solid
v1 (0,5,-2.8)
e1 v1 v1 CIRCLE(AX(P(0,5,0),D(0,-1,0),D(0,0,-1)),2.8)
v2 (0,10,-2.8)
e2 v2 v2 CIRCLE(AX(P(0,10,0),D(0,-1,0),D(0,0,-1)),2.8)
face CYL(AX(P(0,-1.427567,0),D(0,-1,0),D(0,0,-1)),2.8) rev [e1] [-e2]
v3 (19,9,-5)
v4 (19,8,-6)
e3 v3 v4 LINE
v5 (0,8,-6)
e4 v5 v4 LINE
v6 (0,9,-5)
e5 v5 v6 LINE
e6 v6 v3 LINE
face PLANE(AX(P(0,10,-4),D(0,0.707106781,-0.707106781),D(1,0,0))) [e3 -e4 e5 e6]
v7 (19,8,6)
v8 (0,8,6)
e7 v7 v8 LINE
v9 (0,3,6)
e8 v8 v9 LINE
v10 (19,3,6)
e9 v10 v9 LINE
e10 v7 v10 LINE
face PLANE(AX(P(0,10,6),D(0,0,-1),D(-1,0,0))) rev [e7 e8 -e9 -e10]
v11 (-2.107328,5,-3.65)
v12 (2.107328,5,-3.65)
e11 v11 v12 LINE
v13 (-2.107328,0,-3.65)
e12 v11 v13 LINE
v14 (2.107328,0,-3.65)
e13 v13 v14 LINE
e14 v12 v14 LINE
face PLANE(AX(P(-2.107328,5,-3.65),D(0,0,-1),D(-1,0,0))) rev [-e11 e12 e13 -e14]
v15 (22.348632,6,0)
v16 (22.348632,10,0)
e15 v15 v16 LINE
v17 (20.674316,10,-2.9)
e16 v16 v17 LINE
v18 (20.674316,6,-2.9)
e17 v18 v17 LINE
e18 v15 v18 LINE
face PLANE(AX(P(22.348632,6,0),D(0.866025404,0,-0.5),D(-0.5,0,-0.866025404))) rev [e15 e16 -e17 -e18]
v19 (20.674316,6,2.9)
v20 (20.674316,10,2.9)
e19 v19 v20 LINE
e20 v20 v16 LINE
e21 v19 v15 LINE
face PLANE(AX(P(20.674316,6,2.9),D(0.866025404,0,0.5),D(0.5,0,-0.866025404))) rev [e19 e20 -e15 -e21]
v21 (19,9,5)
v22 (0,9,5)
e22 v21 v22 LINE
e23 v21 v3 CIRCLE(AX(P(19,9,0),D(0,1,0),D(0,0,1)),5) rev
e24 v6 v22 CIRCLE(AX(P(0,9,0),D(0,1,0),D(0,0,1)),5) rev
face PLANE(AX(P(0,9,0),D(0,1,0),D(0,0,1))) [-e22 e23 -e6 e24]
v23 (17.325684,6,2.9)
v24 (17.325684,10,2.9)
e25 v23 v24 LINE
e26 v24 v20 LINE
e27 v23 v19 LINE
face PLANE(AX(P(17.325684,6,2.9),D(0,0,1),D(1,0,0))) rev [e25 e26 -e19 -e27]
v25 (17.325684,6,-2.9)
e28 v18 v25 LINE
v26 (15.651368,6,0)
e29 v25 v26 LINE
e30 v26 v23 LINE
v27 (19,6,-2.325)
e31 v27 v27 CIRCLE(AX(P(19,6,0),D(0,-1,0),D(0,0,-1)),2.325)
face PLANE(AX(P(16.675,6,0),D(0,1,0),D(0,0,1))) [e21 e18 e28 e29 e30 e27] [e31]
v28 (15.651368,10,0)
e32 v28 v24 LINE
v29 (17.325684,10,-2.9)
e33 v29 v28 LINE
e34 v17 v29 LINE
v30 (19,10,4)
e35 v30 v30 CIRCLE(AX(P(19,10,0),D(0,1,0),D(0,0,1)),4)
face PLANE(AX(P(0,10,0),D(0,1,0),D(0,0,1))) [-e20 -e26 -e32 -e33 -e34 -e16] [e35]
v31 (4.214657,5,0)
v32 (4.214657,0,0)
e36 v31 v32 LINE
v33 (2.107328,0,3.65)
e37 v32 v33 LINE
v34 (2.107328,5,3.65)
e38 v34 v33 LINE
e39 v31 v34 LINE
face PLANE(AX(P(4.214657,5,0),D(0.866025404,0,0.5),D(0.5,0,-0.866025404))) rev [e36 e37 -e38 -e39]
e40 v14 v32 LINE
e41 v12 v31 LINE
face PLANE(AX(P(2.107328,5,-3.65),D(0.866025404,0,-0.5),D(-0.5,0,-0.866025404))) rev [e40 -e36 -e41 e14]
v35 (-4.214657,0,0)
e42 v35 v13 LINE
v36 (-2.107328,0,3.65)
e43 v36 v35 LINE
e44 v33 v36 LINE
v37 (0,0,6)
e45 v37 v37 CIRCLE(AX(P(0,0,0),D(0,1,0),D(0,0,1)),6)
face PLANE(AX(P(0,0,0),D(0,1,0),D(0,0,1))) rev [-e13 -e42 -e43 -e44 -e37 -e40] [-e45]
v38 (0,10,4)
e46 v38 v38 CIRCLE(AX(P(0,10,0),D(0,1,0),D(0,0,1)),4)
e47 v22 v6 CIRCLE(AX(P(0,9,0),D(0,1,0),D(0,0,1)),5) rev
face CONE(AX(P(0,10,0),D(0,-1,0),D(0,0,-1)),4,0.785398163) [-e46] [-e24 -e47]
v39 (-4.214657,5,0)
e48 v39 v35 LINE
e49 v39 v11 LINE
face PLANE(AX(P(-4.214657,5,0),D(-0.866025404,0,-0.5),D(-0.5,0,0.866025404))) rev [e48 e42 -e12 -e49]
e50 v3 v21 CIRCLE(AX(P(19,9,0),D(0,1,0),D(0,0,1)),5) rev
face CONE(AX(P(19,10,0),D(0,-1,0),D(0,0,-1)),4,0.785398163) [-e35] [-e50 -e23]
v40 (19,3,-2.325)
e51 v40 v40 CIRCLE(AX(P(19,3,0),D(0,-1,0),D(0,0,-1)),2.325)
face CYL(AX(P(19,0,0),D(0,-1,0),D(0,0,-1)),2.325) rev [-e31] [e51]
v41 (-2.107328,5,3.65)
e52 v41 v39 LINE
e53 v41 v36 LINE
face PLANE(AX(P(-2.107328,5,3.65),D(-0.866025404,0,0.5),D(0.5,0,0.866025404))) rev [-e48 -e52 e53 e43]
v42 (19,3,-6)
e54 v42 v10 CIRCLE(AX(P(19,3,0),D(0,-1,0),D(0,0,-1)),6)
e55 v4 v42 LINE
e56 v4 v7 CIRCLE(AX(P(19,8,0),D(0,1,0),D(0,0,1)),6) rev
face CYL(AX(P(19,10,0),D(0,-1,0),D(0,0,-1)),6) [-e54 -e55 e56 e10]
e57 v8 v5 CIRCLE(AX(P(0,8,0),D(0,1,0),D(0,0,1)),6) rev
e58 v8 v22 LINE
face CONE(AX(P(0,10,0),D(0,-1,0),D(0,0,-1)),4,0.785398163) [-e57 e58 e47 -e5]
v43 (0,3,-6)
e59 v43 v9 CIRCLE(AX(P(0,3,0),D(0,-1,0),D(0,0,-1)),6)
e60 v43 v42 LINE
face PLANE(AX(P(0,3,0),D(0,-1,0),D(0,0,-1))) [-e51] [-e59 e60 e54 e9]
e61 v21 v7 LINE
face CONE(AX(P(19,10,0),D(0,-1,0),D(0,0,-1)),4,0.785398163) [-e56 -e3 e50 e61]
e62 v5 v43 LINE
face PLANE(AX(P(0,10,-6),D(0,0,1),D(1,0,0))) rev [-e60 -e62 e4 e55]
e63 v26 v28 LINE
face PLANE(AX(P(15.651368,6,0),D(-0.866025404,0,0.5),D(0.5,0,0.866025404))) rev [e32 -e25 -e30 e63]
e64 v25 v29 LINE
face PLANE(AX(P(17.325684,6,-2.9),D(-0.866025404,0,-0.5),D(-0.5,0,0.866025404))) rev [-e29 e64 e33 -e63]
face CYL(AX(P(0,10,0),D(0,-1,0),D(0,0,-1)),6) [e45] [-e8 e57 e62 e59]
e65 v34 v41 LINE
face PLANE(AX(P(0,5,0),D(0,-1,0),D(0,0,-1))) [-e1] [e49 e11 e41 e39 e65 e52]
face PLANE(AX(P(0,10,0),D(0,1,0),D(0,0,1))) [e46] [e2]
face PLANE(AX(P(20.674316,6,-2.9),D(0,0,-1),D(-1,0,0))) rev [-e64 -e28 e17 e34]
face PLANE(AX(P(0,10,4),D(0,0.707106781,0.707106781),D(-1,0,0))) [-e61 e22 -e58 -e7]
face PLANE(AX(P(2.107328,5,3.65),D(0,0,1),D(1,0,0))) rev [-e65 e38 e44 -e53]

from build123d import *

# Parameters (mm, degrees)
EXTRUDE_1_DEPTH     = 10
CHAMFER_1_SIZE      = 2
CUT_EXTRUDE_1_DEPTH = 5
SKETCH_5_R          = 32.43595028
SKETCH_5_R_2        = 6
CUT_EXTRUDE_2_DEPTH = 3
CUT_EXTRUDE_3_DEPTH = 4
SKETCH_7_W          = 54.061660739
SKETCH_7_H          = 47.527586942
SKETCH_7_R          = 4
CUT_EXTRUDE_4_DEPTH = 1
CHAMFER_2_SIZE      = 1


with BuildPart() as part:
    # 草图1 → 凸台-拉伸1 (new body)
    with BuildSketch(Plane(origin=(0, 0, 0), x_dir=(1, 0, 0), z_dir=(0, 1, 0))):
        with BuildLine():
            Line((0, 6), (19, 6))
            ThreePointArc((19, 6), (25, 0), (19, -6))
            Line((19, -6), (0, -6))
            ThreePointArc((0, -6), (-6, 0), (0, 6))
        make_face()
    extrude(amount=EXTRUDE_1_DEPTH)

    # 草图2 → 切除-旋转1 (revolve, cut)
    with BuildSketch(Plane.XY, mode=Mode.PRIVATE) as cut_revolve_1_sk:
        Polygon((0, 10), (-2.8, 10), (-2.8, 5), (-1.85, 5), (-1.85, 2), (-2.8, 2), (-2.8, 0), (0, 0), align=None)
    revolve(cut_revolve_1_sk.sketch.rotate(Axis((0, -1.427566958, 0), (0, 1, 0)), 270), axis=Axis((0, -1.427566958, 0), (0, 1, 0)), mode=Mode.SUBTRACT)

    # 草图3 → 切除-旋转2 (revolve, cut)
    with BuildSketch(Plane.XY, mode=Mode.PRIVATE) as cut_revolve_2_sk:
        Polygon((19, 0), (16.675, 0), (16.675, 6), (16.25, 6), (16.25, 10), (19, 10), align=None)
    revolve(cut_revolve_2_sk.sketch.rotate(Axis((19, 0, 0), (0, 1, 0)), 270), axis=Axis((19, 0, 0), (0, 1, 0)), mode=Mode.SUBTRACT)

    # 倒角1
    chamfer_1_edges = [part.edges().sort_by_distance(p)[0] for p in [
        (25, 10, 0),
        (9.5, 10, -6),
        (-6, 10, 0),
        (9.5, 10, 6),
    ]]
    chamfer(chamfer_1_edges, length=CHAMFER_1_SIZE)

    # 草图4 → 切除-拉伸1 (cut)
    with BuildSketch(Plane.XZ):
        Polygon((2.107328483, 3.65), (-2.107328483, 3.65), (-4.214656965, 0), (-2.107328483, -3.65), (2.107328483, -3.65), (4.214656965, 0), align=None)
    extrude(amount=-CUT_EXTRUDE_1_DEPTH, mode=Mode.SUBTRACT)

    # 草图5 → 切除-拉伸2 (cut)
    with BuildSketch(Plane.XZ):
        Circle(SKETCH_5_R)
        with Locations(Location((0, 0, 0), (0, 0, 90))):
            Circle(SKETCH_5_R_2, mode=Mode.SUBTRACT)
    extrude(amount=-CUT_EXTRUDE_2_DEPTH, mode=Mode.SUBTRACT)

    # 草图6 → 切除-拉伸3 (cut)
    with BuildSketch(Plane(origin=(0, 10, 0), x_dir=(1, 0, 0), z_dir=(0, 1, 0))):
        Polygon((20.674315781, 2.9), (17.325684219, 2.9), (15.651368439, 0), (17.325684219, -2.9), (20.674315781, -2.9), (22.348631561, 0), align=None)
    extrude(amount=-CUT_EXTRUDE_3_DEPTH, mode=Mode.SUBTRACT)

    # 草图7 → 切除-拉伸4 (cut)
    with BuildSketch(Plane(origin=(0, 10, 0), x_dir=(1, 0, 0), z_dir=(0, 1, 0))):
        with Locations((6.682015694, 1.141108586)):
            Rectangle(SKETCH_7_W, SKETCH_7_H)
        with Locations(Location((0, 0, 0), (0, 0, 270))):
            Circle(SKETCH_7_R, mode=Mode.SUBTRACT)
        with Locations(Location((19, 0, 0), (0, 0, 270))):
            Circle(SKETCH_7_R, mode=Mode.SUBTRACT)
    extrude(amount=-CUT_EXTRUDE_4_DEPTH, mode=Mode.SUBTRACT)

    # 倒角2
    chamfer_2_edges = [part.edges().sort_by_distance(p)[0] for p in [
        (19, 9, -4),
        (0, 9, -4),
    ]]
    chamfer(chamfer_2_edges, length=CHAMFER_2_SIZE - 0.0001)  # a hair under: the kernel refuses the full size


solid = part.part
